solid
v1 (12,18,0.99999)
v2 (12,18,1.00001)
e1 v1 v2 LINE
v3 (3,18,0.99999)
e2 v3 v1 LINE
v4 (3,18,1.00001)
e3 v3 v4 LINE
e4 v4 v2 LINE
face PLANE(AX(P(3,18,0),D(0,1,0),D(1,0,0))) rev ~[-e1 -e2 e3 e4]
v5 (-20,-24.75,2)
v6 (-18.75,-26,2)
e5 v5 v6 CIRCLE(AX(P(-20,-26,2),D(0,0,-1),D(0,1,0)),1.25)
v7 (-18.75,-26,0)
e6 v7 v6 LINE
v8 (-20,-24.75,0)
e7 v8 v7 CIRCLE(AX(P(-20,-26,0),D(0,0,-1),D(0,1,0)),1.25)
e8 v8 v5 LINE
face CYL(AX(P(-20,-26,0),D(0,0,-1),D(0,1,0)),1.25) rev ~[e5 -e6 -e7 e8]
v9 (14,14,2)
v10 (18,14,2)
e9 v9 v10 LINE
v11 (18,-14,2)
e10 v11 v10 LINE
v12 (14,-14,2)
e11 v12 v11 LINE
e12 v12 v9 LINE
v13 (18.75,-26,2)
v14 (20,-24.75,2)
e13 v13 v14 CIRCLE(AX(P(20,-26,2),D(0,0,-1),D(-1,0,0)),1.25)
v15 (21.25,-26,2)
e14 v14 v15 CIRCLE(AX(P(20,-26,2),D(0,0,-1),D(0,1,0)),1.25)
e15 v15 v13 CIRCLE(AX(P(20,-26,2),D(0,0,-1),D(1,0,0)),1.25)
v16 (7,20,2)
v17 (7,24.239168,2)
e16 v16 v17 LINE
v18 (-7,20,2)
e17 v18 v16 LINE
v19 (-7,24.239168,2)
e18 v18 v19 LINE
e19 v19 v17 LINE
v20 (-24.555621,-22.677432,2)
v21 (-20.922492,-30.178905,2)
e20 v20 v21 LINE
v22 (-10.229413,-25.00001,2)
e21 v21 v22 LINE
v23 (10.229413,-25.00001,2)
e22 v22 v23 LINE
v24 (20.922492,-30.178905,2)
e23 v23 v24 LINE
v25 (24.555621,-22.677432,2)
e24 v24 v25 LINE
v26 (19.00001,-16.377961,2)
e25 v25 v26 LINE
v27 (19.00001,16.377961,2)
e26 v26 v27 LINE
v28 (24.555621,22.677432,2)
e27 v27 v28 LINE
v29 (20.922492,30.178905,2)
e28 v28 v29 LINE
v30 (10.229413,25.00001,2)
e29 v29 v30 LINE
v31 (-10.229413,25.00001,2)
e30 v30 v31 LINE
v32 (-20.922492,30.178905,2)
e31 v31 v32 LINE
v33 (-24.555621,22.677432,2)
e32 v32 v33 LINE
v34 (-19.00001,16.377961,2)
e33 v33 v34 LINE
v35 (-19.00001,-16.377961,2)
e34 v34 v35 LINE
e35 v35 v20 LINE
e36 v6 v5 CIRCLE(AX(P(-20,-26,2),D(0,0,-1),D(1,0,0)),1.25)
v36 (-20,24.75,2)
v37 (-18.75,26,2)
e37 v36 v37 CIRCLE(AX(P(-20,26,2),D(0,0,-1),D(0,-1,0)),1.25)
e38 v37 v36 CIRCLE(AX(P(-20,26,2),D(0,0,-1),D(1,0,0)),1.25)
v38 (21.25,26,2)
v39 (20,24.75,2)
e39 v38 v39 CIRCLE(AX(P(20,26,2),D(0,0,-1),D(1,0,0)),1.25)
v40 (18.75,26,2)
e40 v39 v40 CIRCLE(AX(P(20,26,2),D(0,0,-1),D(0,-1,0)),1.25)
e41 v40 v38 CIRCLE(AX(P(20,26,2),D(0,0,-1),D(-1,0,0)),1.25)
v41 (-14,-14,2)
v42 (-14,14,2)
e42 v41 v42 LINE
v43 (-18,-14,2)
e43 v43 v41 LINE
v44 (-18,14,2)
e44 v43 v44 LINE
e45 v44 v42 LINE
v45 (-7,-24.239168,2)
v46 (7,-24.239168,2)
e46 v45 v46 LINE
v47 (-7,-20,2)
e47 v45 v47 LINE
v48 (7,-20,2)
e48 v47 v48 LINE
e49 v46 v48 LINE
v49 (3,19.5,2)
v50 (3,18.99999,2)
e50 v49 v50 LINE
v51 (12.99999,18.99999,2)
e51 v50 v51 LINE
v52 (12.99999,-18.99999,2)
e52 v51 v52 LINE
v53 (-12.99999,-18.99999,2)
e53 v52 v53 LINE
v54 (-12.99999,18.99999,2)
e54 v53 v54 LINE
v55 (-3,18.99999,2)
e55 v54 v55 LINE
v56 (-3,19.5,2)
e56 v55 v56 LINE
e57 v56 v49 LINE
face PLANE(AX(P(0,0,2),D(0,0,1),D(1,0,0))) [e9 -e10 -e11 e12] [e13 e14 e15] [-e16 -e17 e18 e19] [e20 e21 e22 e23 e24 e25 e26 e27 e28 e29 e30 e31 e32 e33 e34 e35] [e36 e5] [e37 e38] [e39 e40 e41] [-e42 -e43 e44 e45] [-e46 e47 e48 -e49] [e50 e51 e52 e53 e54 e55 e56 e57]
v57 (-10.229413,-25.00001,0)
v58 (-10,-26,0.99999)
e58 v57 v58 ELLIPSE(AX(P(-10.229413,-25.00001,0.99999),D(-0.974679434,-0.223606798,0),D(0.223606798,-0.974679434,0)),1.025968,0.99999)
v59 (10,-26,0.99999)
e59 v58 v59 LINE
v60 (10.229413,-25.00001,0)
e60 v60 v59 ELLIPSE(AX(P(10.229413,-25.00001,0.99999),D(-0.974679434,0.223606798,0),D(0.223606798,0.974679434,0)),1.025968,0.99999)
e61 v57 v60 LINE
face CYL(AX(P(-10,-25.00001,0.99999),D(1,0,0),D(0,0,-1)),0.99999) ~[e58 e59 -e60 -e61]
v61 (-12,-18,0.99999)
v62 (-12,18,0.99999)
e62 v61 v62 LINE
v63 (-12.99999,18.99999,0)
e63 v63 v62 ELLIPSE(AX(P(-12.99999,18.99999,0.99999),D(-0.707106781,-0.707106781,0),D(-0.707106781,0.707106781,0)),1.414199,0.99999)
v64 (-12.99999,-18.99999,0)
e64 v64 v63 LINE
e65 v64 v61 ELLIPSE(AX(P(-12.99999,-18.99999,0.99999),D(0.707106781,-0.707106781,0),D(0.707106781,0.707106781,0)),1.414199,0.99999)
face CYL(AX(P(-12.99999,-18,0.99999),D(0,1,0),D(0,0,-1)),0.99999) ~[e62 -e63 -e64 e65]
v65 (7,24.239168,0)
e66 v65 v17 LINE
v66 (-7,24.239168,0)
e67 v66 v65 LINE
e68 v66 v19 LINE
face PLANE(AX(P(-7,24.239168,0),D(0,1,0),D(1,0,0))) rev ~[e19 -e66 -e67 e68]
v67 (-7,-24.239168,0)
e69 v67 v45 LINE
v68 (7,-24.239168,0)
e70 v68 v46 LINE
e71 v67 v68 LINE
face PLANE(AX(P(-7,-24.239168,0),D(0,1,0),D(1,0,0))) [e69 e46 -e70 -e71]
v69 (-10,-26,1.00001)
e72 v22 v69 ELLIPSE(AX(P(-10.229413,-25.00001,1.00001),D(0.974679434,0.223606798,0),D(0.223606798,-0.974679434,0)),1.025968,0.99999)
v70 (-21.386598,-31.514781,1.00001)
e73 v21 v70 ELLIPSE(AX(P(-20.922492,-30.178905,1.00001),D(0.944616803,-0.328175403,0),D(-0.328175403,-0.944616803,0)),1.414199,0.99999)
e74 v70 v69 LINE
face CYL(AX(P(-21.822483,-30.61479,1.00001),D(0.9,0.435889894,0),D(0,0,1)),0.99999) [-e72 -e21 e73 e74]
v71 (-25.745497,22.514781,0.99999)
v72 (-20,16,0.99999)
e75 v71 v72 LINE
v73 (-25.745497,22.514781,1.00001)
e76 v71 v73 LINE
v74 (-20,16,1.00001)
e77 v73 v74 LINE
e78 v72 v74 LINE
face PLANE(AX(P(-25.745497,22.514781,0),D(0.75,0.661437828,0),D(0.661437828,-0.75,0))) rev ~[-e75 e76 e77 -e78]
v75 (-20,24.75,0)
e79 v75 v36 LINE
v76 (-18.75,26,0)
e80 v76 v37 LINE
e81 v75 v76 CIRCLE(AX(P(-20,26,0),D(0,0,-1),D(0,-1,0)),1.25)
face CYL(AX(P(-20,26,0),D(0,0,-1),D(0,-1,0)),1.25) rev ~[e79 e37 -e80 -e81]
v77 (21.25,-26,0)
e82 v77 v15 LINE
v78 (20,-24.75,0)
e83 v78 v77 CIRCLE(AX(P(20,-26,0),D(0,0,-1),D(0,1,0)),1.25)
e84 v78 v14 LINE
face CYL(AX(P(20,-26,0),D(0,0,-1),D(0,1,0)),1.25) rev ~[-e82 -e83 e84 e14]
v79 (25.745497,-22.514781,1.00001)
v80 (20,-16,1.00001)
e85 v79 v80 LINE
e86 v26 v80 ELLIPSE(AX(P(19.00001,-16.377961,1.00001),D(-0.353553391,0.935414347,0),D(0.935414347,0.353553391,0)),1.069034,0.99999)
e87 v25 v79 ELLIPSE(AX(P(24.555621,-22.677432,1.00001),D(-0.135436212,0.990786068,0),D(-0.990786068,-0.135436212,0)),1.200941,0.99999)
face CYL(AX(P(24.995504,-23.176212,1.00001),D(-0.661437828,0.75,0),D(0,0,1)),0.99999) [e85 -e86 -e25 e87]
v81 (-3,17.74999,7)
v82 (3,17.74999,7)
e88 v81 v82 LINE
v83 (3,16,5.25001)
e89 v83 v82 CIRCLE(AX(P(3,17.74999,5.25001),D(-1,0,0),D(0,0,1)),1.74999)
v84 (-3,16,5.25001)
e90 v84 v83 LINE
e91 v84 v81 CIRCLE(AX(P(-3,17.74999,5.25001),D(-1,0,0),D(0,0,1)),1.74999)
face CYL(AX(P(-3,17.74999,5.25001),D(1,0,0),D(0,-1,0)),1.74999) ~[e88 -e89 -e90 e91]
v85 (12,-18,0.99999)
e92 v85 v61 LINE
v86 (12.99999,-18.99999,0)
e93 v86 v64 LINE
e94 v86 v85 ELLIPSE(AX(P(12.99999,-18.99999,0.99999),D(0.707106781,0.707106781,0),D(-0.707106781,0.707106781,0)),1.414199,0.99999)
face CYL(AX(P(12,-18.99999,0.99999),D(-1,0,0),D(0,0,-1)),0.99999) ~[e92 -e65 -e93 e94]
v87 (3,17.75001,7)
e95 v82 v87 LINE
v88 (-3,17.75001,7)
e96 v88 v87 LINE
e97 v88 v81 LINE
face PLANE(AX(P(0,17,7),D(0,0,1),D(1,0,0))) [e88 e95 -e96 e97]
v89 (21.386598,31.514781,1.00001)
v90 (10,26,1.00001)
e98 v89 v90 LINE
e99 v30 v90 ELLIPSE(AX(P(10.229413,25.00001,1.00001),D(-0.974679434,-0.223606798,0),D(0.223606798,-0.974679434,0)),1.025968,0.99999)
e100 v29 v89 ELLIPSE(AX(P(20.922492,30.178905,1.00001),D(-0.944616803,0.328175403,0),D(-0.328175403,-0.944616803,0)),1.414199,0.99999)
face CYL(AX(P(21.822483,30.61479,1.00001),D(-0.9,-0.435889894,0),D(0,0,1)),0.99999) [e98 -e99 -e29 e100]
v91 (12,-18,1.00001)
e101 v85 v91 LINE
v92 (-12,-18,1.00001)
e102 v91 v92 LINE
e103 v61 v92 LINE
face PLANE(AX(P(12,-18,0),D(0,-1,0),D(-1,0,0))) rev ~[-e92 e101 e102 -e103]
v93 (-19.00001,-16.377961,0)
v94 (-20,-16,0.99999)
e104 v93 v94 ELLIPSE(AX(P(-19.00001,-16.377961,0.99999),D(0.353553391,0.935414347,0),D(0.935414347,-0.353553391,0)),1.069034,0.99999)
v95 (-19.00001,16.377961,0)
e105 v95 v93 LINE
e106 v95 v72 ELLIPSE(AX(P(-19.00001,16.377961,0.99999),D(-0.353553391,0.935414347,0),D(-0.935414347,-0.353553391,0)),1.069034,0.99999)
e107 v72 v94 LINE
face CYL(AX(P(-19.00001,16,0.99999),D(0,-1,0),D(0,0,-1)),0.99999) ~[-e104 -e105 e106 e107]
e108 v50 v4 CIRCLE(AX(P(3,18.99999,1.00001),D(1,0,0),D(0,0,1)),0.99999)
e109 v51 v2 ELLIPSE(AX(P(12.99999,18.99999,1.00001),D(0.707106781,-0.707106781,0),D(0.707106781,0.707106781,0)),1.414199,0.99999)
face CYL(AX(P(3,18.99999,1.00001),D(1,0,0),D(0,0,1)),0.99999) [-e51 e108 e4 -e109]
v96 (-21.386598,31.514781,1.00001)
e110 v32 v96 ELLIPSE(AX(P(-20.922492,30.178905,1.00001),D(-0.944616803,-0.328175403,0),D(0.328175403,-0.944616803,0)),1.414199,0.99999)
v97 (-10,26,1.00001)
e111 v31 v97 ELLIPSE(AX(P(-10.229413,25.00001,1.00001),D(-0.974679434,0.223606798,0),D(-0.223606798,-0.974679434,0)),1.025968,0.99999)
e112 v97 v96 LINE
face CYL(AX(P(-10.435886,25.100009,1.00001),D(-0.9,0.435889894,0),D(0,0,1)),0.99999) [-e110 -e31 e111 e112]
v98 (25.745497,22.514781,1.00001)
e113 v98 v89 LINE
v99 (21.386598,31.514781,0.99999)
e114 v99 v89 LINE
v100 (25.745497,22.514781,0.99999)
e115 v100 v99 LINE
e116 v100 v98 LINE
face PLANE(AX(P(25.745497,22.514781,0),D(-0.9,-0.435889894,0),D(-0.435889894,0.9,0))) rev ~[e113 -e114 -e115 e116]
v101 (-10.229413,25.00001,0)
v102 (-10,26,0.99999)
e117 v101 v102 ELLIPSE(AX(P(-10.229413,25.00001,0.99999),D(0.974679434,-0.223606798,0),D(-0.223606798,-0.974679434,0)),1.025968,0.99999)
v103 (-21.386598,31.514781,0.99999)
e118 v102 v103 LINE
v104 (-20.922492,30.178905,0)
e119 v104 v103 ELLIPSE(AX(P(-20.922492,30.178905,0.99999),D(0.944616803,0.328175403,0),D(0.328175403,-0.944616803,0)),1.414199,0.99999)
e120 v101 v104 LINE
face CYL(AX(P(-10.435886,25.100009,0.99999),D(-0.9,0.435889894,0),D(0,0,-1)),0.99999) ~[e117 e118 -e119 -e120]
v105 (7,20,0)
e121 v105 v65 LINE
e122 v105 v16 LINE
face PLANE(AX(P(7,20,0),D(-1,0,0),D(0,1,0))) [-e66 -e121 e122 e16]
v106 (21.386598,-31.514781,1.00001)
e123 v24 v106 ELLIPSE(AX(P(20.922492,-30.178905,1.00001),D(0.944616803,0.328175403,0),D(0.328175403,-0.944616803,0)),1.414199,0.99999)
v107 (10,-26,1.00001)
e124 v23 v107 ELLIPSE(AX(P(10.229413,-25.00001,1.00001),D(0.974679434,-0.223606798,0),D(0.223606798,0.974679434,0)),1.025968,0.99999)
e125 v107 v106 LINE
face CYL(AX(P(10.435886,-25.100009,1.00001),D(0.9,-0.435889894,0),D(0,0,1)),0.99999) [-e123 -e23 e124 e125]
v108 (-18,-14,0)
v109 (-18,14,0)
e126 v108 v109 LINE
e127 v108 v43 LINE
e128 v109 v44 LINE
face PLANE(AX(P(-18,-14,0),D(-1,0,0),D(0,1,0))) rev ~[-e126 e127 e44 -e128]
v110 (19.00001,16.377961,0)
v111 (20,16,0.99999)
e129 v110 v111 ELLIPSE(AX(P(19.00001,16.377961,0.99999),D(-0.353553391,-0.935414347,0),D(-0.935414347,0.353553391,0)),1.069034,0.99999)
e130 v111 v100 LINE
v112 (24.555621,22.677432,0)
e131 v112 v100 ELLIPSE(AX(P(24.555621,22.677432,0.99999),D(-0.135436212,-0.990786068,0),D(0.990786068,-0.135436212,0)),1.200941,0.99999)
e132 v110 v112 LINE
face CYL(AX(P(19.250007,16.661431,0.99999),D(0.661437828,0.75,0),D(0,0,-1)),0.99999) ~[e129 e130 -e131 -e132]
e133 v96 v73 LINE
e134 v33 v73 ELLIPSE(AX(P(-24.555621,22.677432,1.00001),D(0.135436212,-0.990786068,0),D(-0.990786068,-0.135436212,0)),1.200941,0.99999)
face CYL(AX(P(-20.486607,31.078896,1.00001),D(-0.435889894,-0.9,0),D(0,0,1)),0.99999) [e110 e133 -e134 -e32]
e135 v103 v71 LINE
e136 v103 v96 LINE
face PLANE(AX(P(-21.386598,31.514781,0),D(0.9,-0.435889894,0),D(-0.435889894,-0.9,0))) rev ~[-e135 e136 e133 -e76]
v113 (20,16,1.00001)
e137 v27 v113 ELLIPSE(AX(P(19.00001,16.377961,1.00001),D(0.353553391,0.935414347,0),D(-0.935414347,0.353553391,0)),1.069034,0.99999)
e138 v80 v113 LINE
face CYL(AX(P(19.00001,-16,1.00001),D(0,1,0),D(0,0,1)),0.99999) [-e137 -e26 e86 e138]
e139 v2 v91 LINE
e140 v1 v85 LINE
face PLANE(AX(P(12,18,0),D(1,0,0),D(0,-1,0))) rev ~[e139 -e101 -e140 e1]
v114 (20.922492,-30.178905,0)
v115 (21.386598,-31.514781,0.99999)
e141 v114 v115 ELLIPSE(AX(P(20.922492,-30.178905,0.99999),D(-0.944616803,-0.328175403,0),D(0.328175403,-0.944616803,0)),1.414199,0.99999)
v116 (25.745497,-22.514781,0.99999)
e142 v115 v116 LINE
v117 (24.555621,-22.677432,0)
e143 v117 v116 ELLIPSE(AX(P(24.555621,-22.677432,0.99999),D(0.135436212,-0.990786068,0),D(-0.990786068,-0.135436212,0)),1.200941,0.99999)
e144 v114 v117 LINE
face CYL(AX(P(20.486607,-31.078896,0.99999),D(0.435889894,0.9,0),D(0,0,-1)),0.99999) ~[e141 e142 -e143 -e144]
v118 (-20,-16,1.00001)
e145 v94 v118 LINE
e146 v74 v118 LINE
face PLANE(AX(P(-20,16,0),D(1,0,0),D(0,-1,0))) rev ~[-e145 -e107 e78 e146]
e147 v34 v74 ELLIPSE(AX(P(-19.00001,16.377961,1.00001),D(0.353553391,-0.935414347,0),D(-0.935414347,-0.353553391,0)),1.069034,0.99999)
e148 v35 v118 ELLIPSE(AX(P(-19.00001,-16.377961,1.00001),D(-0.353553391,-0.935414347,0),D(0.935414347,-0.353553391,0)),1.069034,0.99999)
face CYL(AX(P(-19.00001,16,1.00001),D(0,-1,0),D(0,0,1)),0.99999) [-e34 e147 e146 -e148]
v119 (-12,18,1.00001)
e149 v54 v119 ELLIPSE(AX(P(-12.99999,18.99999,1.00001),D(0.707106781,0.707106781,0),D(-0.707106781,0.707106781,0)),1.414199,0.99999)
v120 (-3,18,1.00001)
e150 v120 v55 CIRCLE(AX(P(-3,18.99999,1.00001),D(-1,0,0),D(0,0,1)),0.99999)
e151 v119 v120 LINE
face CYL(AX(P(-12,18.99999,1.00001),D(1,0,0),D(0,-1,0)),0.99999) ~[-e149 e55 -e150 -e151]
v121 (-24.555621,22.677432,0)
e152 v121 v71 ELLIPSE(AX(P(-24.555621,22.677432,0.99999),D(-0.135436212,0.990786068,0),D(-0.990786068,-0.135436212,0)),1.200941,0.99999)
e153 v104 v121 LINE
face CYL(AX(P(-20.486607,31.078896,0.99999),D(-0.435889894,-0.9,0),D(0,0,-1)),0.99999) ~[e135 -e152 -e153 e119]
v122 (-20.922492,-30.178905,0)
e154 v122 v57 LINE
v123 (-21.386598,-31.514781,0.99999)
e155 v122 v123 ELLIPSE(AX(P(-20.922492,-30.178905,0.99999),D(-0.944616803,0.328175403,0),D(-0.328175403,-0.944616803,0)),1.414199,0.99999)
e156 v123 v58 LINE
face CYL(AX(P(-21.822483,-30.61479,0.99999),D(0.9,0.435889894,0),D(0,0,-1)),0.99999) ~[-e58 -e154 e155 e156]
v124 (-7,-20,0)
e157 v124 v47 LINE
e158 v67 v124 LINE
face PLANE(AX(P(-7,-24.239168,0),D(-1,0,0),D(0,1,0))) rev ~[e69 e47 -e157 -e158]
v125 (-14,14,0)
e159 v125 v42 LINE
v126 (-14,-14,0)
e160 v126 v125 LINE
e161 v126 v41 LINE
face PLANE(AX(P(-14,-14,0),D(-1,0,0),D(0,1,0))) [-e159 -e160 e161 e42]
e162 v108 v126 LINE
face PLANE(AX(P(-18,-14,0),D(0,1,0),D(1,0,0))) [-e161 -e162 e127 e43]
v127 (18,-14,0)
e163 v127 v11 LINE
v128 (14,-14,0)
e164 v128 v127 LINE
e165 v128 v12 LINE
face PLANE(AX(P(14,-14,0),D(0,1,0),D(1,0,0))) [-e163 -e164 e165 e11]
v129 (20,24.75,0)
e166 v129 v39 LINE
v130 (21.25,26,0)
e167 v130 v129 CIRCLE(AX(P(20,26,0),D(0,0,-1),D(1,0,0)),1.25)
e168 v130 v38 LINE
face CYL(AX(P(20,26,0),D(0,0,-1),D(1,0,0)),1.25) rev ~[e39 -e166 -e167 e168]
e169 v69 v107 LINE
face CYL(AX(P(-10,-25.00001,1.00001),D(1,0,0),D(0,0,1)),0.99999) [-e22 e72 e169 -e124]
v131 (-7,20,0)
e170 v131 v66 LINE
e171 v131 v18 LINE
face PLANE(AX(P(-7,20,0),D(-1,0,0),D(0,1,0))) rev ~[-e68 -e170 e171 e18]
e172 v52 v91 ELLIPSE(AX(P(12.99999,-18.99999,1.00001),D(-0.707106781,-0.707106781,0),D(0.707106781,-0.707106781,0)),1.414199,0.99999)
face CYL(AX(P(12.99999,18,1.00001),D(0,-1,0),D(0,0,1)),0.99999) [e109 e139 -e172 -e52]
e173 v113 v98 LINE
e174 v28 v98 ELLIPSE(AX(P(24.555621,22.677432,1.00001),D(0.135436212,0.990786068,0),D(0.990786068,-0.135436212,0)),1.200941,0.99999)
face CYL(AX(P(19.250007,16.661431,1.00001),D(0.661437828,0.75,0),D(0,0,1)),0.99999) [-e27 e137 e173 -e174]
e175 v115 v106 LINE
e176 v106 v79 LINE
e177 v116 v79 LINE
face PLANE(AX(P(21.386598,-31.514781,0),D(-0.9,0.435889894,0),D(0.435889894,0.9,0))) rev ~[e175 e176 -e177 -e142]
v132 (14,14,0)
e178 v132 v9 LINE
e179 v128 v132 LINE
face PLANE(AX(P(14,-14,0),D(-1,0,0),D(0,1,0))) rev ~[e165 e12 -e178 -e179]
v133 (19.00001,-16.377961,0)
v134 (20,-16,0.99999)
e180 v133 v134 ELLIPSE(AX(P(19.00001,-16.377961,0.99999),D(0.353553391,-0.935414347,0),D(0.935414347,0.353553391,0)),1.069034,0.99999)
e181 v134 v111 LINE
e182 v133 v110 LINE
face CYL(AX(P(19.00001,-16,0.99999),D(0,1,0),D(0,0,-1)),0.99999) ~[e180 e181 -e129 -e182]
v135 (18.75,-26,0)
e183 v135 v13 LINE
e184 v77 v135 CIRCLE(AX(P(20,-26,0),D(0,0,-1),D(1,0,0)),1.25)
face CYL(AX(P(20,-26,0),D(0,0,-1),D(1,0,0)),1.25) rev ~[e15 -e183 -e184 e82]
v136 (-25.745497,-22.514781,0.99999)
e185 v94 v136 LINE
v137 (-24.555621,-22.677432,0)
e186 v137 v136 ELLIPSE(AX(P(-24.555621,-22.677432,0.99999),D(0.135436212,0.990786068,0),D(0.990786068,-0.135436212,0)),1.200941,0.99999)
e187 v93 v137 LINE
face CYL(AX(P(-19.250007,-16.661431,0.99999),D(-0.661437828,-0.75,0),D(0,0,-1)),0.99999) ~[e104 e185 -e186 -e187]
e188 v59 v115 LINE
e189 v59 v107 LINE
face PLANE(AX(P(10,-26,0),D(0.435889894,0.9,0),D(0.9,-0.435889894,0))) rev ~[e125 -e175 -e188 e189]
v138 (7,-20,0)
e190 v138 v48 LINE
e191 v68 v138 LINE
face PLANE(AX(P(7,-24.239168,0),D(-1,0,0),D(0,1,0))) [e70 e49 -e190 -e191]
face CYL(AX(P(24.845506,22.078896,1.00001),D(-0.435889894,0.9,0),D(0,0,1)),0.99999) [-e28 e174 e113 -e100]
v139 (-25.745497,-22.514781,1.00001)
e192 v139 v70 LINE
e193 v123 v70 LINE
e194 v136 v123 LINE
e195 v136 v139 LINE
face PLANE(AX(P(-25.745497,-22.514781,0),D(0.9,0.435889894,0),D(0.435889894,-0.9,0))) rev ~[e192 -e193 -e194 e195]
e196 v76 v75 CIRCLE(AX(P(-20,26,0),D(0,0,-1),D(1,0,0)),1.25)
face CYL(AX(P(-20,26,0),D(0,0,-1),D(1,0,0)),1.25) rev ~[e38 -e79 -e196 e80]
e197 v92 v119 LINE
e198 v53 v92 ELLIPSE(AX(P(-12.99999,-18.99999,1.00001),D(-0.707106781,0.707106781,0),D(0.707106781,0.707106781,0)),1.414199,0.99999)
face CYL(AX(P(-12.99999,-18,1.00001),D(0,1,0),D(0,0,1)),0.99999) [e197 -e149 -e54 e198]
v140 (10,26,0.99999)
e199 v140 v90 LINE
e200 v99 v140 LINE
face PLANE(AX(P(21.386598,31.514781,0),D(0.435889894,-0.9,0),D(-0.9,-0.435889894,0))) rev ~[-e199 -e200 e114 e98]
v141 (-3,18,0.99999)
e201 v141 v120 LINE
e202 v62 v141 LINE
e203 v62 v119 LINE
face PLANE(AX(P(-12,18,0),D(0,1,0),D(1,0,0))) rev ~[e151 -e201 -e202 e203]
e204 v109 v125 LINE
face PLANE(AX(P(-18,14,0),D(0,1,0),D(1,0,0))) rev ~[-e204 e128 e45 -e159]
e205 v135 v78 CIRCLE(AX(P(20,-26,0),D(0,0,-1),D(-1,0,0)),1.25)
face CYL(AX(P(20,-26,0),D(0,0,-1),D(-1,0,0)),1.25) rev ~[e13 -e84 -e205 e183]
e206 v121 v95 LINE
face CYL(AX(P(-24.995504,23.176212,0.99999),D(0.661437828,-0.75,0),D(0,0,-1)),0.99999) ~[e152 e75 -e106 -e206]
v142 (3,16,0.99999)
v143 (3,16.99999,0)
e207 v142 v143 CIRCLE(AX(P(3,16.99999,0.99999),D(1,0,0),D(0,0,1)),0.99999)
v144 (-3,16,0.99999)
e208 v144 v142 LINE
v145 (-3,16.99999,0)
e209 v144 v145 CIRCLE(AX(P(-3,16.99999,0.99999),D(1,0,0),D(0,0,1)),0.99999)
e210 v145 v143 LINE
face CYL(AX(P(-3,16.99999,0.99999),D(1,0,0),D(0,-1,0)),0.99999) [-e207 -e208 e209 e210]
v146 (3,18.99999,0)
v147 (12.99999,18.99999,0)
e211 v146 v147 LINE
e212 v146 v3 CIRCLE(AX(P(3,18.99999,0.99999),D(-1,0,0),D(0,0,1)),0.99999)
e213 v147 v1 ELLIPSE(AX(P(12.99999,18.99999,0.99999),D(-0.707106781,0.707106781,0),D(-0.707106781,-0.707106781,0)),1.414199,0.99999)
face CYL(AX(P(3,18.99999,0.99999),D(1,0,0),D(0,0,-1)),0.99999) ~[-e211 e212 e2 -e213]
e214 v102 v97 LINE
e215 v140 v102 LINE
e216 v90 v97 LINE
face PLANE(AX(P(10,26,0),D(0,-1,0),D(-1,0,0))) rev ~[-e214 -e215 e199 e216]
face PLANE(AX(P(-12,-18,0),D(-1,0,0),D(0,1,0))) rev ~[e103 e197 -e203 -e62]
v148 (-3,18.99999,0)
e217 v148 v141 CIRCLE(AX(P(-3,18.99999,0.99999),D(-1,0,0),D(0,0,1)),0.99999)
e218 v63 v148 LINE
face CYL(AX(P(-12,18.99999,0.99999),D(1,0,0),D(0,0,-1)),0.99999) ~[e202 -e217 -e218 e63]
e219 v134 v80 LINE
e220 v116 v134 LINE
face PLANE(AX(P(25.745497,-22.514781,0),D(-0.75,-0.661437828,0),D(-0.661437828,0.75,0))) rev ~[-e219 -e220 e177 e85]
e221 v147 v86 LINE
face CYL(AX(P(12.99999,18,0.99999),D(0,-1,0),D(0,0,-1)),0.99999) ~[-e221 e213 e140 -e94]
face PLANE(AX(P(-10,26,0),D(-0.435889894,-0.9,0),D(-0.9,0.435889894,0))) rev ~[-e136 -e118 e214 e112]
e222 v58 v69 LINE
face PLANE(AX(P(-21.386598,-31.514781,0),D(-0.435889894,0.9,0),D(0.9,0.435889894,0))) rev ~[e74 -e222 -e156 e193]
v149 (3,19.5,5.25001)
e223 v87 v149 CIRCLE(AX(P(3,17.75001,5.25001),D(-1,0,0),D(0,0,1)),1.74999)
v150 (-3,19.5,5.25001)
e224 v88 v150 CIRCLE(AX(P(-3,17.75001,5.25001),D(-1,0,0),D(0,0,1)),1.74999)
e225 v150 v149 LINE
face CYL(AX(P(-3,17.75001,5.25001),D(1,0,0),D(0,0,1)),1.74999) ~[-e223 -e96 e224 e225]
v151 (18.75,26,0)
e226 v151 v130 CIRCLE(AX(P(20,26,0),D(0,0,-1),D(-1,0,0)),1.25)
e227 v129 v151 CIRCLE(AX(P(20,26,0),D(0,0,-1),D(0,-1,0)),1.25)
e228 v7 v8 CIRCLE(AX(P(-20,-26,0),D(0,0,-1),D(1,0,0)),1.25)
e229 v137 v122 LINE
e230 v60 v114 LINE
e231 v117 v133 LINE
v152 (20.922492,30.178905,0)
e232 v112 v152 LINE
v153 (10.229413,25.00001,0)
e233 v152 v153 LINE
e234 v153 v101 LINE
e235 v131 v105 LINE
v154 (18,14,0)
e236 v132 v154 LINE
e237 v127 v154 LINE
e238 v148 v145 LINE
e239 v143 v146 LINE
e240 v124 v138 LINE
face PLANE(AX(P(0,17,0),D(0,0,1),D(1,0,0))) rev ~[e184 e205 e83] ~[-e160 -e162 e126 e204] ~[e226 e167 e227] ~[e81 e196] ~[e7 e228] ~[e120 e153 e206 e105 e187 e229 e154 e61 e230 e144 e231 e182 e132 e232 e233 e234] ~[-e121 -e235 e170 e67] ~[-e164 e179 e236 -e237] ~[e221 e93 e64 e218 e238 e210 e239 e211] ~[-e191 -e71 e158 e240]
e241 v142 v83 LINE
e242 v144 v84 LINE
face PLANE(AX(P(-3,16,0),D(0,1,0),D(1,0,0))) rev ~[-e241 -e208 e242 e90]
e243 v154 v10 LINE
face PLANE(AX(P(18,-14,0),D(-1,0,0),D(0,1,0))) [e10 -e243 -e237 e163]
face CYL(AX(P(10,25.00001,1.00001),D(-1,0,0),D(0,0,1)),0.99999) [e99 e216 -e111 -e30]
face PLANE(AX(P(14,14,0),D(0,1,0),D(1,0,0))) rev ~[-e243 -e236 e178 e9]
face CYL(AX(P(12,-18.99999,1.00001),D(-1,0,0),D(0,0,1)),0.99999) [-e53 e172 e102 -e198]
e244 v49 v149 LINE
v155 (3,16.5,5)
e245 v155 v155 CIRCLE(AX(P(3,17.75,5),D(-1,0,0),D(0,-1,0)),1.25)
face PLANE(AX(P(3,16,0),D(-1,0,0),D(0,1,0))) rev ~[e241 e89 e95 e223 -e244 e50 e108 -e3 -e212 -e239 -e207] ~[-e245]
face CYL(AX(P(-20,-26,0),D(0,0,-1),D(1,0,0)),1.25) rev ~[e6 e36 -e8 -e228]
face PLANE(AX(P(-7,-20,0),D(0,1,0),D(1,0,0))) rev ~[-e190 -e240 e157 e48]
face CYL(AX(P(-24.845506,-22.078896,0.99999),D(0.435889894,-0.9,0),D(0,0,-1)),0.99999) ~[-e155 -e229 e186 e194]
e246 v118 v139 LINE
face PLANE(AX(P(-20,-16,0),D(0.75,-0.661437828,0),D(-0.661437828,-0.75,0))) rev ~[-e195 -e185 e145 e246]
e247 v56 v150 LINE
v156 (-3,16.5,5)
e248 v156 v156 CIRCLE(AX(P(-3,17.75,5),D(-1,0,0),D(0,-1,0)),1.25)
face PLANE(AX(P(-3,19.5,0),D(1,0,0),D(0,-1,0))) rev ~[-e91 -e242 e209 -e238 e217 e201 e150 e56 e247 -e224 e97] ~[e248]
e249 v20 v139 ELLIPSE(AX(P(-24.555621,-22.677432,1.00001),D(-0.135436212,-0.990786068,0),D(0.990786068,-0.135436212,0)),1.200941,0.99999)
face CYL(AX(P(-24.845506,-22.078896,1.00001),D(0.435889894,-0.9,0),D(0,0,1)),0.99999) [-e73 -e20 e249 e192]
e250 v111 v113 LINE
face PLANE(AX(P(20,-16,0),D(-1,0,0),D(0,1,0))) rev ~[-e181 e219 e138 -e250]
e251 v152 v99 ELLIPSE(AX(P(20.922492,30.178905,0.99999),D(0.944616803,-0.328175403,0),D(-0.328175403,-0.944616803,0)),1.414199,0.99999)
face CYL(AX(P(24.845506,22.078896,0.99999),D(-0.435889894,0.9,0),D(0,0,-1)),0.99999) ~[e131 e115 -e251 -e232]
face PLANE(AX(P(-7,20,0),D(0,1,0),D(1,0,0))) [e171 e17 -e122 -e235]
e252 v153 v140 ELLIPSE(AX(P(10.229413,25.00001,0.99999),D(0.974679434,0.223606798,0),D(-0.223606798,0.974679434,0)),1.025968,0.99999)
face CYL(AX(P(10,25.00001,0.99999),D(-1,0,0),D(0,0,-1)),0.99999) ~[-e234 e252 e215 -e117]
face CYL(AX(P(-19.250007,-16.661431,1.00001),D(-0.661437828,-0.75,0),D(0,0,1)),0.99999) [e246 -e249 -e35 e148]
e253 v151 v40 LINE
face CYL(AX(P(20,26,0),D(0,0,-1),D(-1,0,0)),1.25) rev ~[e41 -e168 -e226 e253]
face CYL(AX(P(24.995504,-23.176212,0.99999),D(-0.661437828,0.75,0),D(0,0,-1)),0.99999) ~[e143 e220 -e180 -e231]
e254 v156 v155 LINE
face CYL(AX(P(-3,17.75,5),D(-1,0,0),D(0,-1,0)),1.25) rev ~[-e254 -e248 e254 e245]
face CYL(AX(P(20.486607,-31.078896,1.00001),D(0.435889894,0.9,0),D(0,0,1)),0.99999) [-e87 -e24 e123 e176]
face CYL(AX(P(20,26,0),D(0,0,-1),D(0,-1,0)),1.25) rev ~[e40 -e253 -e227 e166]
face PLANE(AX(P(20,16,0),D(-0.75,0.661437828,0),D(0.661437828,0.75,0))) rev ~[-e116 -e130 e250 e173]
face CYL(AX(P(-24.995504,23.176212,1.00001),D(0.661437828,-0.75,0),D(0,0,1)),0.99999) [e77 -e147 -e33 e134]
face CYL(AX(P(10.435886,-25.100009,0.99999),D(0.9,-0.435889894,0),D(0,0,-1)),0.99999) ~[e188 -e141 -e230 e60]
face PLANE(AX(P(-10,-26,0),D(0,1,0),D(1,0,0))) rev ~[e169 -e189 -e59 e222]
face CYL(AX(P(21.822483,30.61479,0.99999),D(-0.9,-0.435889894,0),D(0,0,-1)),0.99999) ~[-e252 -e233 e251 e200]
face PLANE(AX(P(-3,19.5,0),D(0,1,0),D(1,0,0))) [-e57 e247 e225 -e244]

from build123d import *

# Parameters (mm, degrees)
F0_W     = 14
F0_H     = 4.2391675711
F0_W_2   = 4
F0_H_2   = 28
F1_DEPTH = 2
F0_W_3   = 6
F0_H_3   = 2
F0_H_4   = 1.5
F2_DEPTH = 7
F3_R     = 1.74999
F4_R     = 1.25
F5_DEPTH = 25
F6_R     = 0.99999


# Not quite as in the source:
# - a fillet or chamfer is up to 0.001 mm smaller than in the source, because OpenCascade refuses the exact size
# - a feature names something its author has since deleted; it is built from what else it names


with BuildPart() as f1:
    # F0 (on Top) → F1 (new body)
    with BuildSketch(Plane.XY):
        with BuildLine():
            Line((-10, -26), (10, -26))
            ThreePointArc((10, -26), (12.9289321881, -18.9289321881), (20, -16))
            Line((20, -16), (20, 16))
            ThreePointArc((20, 16), (12.9289321881, 18.9289321881), (10, 26))
            Line((10, 26), (-10, 26))
            ThreePointArc((-10, 26), (-12.9289321881, 18.9289321881), (-20, 16))
            Line((-20, 16), (-20, -16))
            ThreePointArc((-20, -16), (-12.9289321881, -18.9289321881), (-10, -26))
        make_face()
        with Locations((0, -22.1195837855)):
            Rectangle(F0_W, F0_H, mode=Mode.SUBTRACT)
        with Locations((-16, 0)):
            Rectangle(F0_W_2, F0_H_2, mode=Mode.SUBTRACT)
        Polygon((3, 18), (10, 18), (12, 18), (12, -18), (-12, -18), (-12, 18), (-10, 18), (-3, 18), (-3, 19.5), (3, 19.5), align=None, mode=Mode.SUBTRACT)
        with Locations((16, 0)):
            Rectangle(F0_W_2, F0_H_2, mode=Mode.SUBTRACT)
        with Locations((0, 22.1195837855)):
            Rectangle(F0_W, F0_H, mode=Mode.SUBTRACT)
        with BuildLine():
            Line((-20, 24.75), (-20, 16))
            ThreePointArc((-20, 16), (-12.9289321881, 18.9289321881), (-10, 26))
            Line((-10, 26), (-18.75, 26))
            ThreePointArc((-18.75, 26), (-19.1161165235, 25.1161165235), (-20, 24.75))
        make_face()
        with BuildLine():
            Line((-25.7454968465, 22.5147810633), (-20, 16))
            Line((-20, 16), (-20, 24.75))
            ThreePointArc((-20, 24.75), (-20.8838834765, 26.8838834765), (-18.75, 26))
            Line((-18.75, 26), (-10, 26))
            Line((-10, 26), (-21.386597903, 31.5147810633))
            Line((-21.386597903, 31.5147810633), (-25.7454968465, 22.5147810633))
        make_face()
        with BuildLine():
            ThreePointArc((10, 26), (12.9289321881, 18.9289321881), (20, 16))
            Line((20, 16), (20, 24.75))
            ThreePointArc((20, 24.75), (19.1161165235, 25.1161165235), (18.75, 26))
            Line((18.75, 26), (10, 26))
        make_face()
        with BuildLine():
            Line((20, 24.75), (20, 16))
            Line((20, 16), (25.7454968465, 22.5147810633))
            Line((25.7454968465, 22.5147810633), (21.386597903, 31.5147810633))
            Line((21.386597903, 31.5147810633), (10, 26))
            Line((10, 26), (18.75, 26))
            ThreePointArc((18.75, 26), (20, 27.25), (21.25, 26))
            ThreePointArc((21.25, 26), (20.8838834765, 25.1161165235), (20, 24.75))
        make_face()
        with BuildLine():
            ThreePointArc((20, -16), (12.9289321881, -18.9289321881), (10, -26))
            Line((10, -26), (18.75, -26))
            ThreePointArc((18.75, -26), (19.1161165235, -25.1161165235), (20, -24.75))
            Line((20, -24.75), (20, -16))
        make_face()
        with BuildLine():
            Line((18.75, -26), (10, -26))
            Line((10, -26), (21.386597903, -31.5147810633))
            Line((21.386597903, -31.5147810633), (25.7454968465, -22.5147810633))
            Line((25.7454968465, -22.5147810633), (20, -16))
            Line((20, -16), (20, -24.75))
            ThreePointArc((20, -24.75), (20.8838834765, -25.1161165235), (21.25, -26))
            ThreePointArc((21.25, -26), (20, -27.25), (18.75, -26))
        make_face()
        with BuildLine():
            Line((-21.386597903, -31.5147810633), (-10, -26))
            Line((-10, -26), (-18.75, -26))
            ThreePointArc((-18.75, -26), (-20.8838834765, -26.8838834765), (-20, -24.75))
            Line((-20, -24.75), (-20, -16))
            Line((-20, -16), (-25.7454968465, -22.5147810633))
            Line((-25.7454968465, -22.5147810633), (-21.386597903, -31.5147810633))
        make_face()
        with BuildLine():
            Line((-18.75, -26), (-10, -26))
            ThreePointArc((-10, -26), (-12.9289321881, -18.9289321881), (-20, -16))
            Line((-20, -16), (-20, -24.75))
            ThreePointArc((-20, -24.75), (-19.1161165235, -25.1161165235), (-18.75, -26))
        make_face()
    extrude(amount=F1_DEPTH)

    # F0 (on Top) → F2 (join)
    with BuildSketch(Plane.XY):
        with Locations((0, 17)):
            Rectangle(F0_W_3, F0_H_3)
        with Locations((0, 18.75)):
            Rectangle(F0_W_3, F0_H_4)
    extrude(amount=F2_DEPTH)

    # F3 (radius 1.75 in the source; OpenCascade refuses exactly that, so slightly less here)
    f3_edges = [f1.edges().sort_by_distance(p)[0] for p in [
        (0, 16, 7),
        (0, 19.5, 7),
    ]]
    fillet(f3_edges, radius=F3_R)

    # F4 (on face) → F5 (cut)
    with BuildSketch(Plane(origin=(-3, 0, 0), x_dir=(0, -1, 0), z_dir=(-1, 0, 0))):
        with Locations((-17.75, 5)):
            Circle(F4_R)
    extrude(amount=-F5_DEPTH, mode=Mode.SUBTRACT)

    # F6 (radius 1 in the source; OpenCascade refuses exactly that, so slightly less here)
    f6_edges = [f1.edges().sort_by_distance(p)[0] for p in [
        (-20, 0, 2),
        (-23.566047, -27.014781, 2),
        (0, -26, 2),
        (20, 0, 2),
        (15.693299, 28.757391, 2),
        (0, 26, 2),
        (-23.566047, 27.014781, 2),
        (-23.566047, 27.014781, 0),
        (0, 26, 0),
        (15.693299, 28.757391, 0),
        (20, 0, 0),
        (-23.566047, -27.014781, 0),
        (0, -26, 0),
        (-20, 0, 0),
        (-12, 0, 2),
        (-7.5, 18, 2),
        (7.5, 18, 2),
        (12, 0, 2),
        (0, -18, 2),
        (0, 16, 0),
        (-12, 0, 0),
        (0, -18, 0),
        (12, 0, 0),
        (-22.872748, 19.257391, 2),
        (-22.872748, 19.257391, 0),
        (-15.693299, 28.757391, 2),
        (-15.693299, 28.757391, 0),
        (22.872748, 19.257391, 2),
        (22.872748, 19.257391, 0),
        (22.872748, -19.257391, 2),
        (22.872748, -19.257391, 0),
        (15.693299, -28.757391, 0),
        (15.693299, -28.757391, 2),
        (-15.693299, -28.757391, 0),
        (-15.693299, -28.757391, 2),
        (-22.872748, -19.257391, 0),
        (-22.872748, -19.257391, 2),
        (7.5, 18, 0),
        (-7.5, 18, 0),
        (23.566047, -27.014781, 2),
        (23.566047, -27.014781, 0),
        (23.566047, 27.014781, 2),
        (23.566047, 27.014781, 0),
    ]]
    fillet(f6_edges, radius=F6_R)


solid = f1.part
